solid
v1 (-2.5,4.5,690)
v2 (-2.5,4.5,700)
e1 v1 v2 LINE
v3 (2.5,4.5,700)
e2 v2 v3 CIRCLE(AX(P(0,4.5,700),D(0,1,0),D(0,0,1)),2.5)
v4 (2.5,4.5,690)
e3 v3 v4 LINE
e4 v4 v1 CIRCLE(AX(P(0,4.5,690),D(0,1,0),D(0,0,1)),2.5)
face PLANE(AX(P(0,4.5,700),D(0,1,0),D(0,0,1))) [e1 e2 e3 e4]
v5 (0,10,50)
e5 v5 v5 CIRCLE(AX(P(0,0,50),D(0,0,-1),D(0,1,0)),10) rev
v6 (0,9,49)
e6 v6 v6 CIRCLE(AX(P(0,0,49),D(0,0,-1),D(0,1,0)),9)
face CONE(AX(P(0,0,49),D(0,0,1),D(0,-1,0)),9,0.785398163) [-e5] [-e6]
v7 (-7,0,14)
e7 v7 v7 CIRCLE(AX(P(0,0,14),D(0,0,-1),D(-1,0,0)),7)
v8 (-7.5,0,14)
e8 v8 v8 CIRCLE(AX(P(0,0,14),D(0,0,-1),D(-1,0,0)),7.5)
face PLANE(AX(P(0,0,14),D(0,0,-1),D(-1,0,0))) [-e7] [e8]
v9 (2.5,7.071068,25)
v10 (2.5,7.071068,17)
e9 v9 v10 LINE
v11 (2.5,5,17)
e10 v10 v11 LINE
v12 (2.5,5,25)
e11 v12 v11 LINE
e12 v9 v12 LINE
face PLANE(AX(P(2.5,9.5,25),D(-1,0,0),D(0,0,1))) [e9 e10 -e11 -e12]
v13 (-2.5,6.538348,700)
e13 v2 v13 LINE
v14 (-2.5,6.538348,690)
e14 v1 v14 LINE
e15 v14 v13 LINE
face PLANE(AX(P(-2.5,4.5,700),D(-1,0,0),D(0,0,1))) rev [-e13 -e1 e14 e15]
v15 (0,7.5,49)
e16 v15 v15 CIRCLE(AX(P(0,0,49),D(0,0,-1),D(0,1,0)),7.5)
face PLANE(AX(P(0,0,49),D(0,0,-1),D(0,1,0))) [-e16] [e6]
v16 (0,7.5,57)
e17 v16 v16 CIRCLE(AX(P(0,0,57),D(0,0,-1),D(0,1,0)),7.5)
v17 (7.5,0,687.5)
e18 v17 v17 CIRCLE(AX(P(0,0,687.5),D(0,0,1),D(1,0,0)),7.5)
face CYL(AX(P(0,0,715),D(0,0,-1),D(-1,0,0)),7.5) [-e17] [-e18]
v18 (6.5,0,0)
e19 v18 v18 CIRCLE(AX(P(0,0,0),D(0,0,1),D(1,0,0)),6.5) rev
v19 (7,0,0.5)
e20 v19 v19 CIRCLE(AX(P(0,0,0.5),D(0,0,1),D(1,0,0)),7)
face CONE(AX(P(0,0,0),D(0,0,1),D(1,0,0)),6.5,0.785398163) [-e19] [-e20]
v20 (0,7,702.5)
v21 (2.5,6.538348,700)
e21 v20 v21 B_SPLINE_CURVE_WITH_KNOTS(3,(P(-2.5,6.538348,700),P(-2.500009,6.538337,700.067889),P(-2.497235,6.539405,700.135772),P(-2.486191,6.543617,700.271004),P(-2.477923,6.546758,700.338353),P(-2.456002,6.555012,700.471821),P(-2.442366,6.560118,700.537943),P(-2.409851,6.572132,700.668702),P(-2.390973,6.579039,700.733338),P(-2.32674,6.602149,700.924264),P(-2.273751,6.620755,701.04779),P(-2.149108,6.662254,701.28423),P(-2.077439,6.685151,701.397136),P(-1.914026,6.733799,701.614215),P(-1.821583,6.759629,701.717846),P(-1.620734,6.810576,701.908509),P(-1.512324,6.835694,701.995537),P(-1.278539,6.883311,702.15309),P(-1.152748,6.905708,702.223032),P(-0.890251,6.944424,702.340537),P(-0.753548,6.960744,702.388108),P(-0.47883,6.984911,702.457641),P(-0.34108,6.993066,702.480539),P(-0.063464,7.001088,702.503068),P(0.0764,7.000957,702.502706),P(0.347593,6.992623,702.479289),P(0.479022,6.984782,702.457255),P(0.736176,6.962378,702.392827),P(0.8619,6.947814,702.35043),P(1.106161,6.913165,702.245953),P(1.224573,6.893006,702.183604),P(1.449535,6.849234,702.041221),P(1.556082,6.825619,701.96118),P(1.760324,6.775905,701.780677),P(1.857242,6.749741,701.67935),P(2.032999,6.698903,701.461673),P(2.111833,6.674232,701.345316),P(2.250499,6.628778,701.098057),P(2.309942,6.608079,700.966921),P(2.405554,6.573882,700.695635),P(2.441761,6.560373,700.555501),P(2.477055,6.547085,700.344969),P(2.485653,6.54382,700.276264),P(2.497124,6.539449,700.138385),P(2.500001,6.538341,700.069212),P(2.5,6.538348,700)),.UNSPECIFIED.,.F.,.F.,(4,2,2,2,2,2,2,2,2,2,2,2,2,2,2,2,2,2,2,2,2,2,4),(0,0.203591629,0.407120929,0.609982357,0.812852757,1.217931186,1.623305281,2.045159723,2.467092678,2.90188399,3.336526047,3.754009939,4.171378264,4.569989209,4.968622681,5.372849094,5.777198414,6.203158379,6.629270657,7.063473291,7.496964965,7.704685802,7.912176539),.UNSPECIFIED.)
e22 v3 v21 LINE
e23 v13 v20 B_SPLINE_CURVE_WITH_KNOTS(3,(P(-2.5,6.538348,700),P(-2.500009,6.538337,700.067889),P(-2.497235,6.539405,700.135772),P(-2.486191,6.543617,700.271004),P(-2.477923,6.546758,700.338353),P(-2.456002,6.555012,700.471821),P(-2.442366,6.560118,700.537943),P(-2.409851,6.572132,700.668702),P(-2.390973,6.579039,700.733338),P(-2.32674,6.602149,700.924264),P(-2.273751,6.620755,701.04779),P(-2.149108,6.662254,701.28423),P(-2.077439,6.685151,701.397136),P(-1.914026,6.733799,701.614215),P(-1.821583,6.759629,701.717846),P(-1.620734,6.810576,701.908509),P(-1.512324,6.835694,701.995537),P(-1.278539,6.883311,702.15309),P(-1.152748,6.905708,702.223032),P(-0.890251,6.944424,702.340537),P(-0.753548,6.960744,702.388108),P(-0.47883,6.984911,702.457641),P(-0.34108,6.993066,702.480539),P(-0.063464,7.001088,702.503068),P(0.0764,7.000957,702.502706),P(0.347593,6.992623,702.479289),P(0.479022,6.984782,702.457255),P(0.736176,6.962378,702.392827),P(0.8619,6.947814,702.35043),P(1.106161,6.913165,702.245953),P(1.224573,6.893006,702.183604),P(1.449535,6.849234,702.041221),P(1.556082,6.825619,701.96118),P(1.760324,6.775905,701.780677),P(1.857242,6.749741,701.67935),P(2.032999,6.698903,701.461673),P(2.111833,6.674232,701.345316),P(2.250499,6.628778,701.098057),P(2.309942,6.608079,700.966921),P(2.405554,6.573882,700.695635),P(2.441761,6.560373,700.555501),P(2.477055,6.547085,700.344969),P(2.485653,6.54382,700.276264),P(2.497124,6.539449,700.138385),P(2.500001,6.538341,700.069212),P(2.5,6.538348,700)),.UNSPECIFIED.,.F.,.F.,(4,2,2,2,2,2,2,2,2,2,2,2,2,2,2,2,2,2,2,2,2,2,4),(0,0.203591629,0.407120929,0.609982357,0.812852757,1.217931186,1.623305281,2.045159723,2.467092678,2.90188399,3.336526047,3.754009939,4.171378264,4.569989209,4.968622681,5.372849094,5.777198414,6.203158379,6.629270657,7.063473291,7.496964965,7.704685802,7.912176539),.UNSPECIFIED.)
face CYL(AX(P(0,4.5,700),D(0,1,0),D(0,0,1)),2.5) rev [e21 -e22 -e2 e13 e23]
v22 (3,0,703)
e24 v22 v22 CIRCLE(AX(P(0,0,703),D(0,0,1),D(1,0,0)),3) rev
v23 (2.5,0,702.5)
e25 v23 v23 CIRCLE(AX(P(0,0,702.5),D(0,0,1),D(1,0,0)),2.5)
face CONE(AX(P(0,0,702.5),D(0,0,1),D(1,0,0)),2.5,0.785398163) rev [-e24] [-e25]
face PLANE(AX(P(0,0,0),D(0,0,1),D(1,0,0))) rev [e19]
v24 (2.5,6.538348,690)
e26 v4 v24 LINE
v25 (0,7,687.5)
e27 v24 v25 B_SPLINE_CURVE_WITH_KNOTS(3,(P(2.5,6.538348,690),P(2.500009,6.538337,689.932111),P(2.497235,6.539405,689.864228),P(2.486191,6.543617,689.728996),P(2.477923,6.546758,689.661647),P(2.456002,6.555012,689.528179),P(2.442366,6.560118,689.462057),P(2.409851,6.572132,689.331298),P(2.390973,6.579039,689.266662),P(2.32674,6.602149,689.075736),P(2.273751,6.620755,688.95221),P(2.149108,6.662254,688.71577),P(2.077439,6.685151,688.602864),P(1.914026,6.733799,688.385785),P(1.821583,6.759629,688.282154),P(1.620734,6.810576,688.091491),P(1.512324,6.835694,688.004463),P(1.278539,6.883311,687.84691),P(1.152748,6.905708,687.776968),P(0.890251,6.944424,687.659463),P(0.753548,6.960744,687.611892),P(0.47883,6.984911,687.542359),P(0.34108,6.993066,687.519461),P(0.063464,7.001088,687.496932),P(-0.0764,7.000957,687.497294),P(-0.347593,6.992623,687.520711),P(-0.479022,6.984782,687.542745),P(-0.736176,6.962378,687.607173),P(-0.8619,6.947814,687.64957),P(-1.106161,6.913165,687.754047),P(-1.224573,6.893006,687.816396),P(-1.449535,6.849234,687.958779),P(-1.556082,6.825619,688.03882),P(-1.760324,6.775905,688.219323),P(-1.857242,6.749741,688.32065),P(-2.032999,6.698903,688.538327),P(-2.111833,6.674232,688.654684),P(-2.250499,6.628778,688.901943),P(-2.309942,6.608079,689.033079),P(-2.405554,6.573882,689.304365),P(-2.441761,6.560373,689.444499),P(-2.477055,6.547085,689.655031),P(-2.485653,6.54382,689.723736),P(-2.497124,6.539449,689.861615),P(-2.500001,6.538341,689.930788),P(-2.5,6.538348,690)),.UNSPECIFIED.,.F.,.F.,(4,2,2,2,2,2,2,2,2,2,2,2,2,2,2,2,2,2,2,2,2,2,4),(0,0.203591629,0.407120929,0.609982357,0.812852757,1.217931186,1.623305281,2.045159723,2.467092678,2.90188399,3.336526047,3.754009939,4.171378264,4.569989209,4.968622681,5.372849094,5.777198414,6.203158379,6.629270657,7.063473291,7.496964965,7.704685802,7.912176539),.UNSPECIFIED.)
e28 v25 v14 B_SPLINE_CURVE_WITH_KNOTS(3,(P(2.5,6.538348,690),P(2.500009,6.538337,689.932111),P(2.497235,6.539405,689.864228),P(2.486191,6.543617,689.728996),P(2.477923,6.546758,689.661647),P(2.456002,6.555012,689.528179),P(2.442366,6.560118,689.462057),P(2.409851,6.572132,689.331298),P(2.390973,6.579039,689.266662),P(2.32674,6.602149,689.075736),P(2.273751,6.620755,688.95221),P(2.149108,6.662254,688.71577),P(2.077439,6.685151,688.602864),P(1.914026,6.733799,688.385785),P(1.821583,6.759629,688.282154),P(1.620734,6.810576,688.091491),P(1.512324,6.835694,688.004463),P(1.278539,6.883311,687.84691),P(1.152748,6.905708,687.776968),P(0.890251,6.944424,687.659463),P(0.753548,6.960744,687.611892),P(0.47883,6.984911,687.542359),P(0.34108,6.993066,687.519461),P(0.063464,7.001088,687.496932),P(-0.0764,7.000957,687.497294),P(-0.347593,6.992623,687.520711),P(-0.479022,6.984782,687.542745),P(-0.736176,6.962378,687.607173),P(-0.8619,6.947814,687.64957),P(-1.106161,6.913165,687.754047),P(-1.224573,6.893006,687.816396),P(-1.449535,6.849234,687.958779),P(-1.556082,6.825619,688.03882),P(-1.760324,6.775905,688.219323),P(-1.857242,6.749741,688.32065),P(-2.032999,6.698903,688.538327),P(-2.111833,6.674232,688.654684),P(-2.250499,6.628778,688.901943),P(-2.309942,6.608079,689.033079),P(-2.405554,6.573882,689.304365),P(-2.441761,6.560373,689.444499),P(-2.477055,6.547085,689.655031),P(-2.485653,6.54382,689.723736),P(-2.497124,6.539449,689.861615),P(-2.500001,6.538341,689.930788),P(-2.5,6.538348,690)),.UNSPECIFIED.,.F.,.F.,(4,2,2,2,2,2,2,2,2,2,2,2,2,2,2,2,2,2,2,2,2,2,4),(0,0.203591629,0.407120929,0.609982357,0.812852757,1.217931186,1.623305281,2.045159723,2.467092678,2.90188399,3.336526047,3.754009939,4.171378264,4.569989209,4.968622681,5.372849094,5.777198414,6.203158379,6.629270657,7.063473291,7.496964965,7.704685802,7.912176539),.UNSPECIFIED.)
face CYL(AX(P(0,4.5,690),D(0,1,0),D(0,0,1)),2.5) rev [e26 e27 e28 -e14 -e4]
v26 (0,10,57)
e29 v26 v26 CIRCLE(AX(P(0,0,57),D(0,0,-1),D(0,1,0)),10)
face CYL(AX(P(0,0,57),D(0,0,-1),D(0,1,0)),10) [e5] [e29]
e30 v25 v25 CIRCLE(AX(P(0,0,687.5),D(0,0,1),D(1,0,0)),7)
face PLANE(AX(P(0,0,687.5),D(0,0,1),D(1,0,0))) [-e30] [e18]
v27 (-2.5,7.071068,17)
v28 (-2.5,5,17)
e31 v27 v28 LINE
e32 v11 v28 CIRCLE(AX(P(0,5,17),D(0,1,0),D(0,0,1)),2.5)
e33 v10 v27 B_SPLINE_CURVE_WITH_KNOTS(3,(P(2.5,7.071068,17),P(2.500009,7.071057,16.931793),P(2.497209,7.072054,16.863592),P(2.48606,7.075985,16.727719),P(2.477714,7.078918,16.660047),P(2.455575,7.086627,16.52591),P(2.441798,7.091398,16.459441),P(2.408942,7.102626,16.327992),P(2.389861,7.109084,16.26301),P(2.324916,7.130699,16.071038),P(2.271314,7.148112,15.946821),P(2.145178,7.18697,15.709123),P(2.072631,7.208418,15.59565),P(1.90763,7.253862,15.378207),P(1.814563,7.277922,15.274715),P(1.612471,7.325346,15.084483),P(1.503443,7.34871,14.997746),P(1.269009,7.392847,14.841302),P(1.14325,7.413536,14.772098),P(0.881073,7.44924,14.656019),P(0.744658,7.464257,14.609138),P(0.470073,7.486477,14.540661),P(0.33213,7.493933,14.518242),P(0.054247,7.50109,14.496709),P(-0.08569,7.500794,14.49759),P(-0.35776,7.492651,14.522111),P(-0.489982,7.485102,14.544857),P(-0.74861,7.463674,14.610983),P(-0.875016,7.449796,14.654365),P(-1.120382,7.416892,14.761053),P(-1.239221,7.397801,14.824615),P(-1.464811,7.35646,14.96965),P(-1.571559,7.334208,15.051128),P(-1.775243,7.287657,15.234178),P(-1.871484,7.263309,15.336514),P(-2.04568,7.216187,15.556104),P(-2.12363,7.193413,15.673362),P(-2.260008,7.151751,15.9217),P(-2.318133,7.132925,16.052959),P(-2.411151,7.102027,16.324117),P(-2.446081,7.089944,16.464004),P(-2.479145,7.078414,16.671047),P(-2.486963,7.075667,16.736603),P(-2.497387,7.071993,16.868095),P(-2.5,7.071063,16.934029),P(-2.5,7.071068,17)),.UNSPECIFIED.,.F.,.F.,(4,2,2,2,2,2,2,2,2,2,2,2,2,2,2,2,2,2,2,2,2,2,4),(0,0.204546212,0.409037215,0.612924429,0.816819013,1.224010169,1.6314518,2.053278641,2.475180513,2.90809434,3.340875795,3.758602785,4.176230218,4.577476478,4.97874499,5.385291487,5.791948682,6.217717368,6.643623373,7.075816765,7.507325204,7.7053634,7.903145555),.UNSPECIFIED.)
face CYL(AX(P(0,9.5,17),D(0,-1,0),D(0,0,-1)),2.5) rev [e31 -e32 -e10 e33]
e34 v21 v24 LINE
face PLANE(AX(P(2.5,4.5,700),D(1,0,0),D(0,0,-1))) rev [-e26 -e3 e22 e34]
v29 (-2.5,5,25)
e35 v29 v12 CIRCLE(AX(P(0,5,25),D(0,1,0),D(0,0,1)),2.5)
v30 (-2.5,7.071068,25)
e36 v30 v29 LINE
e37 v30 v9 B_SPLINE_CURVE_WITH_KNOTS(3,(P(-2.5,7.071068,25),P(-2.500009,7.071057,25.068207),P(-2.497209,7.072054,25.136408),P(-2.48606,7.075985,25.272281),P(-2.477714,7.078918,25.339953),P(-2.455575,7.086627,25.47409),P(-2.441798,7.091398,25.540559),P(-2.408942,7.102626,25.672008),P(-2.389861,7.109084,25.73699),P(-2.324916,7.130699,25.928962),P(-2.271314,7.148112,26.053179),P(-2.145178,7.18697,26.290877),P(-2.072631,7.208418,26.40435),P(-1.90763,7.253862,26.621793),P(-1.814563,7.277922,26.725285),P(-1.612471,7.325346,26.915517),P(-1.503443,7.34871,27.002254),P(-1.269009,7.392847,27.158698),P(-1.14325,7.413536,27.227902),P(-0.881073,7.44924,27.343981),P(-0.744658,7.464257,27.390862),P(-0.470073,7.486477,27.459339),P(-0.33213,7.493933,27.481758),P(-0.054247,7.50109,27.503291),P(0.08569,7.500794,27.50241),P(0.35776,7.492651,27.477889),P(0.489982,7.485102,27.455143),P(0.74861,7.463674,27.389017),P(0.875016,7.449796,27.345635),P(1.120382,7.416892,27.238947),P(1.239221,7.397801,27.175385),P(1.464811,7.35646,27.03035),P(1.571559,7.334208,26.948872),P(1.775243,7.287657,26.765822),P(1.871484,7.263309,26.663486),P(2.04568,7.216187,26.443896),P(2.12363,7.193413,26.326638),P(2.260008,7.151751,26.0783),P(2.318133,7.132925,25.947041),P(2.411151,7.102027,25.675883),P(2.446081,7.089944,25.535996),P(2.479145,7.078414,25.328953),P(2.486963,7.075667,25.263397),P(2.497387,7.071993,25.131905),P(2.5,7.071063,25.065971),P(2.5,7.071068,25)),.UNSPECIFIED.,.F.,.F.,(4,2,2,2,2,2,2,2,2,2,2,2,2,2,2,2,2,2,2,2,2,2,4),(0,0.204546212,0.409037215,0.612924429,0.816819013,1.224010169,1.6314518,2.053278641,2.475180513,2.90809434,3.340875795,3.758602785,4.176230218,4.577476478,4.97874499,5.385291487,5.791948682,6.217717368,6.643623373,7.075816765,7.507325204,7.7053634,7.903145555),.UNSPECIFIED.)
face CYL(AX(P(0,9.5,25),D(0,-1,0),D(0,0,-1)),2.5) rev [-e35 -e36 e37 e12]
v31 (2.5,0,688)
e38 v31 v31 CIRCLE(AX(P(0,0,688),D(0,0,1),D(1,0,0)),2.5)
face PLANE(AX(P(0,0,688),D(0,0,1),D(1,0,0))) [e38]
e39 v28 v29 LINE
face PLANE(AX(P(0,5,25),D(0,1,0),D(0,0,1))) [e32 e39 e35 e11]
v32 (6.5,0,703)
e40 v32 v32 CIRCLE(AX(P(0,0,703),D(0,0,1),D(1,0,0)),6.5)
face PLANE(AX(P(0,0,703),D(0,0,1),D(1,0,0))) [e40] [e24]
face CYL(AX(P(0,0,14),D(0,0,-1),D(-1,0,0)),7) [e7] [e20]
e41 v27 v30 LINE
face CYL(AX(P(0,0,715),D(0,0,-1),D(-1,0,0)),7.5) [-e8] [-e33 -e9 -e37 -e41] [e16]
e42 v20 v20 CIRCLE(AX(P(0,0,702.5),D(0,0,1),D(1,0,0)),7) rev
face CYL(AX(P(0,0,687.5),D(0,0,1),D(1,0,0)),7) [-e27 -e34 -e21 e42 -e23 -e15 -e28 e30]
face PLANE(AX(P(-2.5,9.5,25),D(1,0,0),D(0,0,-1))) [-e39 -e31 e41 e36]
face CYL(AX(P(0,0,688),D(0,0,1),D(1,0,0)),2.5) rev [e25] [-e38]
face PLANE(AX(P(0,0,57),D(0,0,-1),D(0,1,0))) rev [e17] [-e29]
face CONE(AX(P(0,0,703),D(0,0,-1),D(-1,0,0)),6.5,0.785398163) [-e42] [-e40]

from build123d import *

# Parameters (mm, degrees)
SKETCH_1_R                = 7.5
EXTRUDE_1_DEPTH           = 715
SKETCH_4_R                = 7.5
SKETCH_4_R_2              = 7
CUT_EXTRUDE_3_DEPTH       = 14
CHAMFER_1_SIZE            = 0.5
CUT_EXTRUDE_START         = -27.5
SKETCH_6_R                = 7.5
SKETCH_6_R_2              = 7
CUT_EXTRUDE_5_DEPTH       = 27.5
CHAMFER_2_SIZE            = 1
CUT_EXTRUDE_START_2       = -12
SKETCH_7_R                = 7
SKETCH_7_R_2              = 6.9
CUT_EXTRUDE_6_DEPTH       = 12
SKETCH_8_R                = 10
SKETCH_8_R_2              = 7.5
EXTRUDE_2_DEPTH           = 8
CHAMFER_3_SIZE            = 1
CUT_EXTRUDE_8_DEPTH       = 2.5
CUT_EXTRUDE_11_DEPTH      = 2.5
CUT_EXTRUDE_11_DEPTH_BACK = 2
SKETCH_17_R               = 6.9
CUT_EXTRUDE_14_DEPTH      = 12
CHAMFER_6_SIZE            = 0.5
SKETCH_20_R               = 2.5
CUT_EXTRUDE_16_DEPTH      = 15
CHAMFER_7_SIZE            = 0.5


with BuildPart() as part:
    # 草图1 → 拉伸1 (new body)
    with BuildSketch(Plane.XY):
        Circle(SKETCH_1_R)
    extrude(amount=EXTRUDE_1_DEPTH)

    # 草图4 → 切除-拉伸3 (cut)
    with BuildSketch(Plane(origin=(0, 0, 0), x_dir=(-1, 0, 0), z_dir=(0, 0, -1))):
        Circle(SKETCH_4_R)
        Circle(SKETCH_4_R_2, mode=Mode.SUBTRACT)
    extrude(amount=-CUT_EXTRUDE_3_DEPTH, mode=Mode.SUBTRACT)

    # 倒角1
    chamfer_1_edges = [part.edges().sort_by_distance(p)[0] for p in [
        (7, 0, 0),
    ]]
    chamfer(chamfer_1_edges, length=CHAMFER_1_SIZE)

    # 草图6 → 切除-拉伸5 (cut)
    with BuildSketch(Plane.XY.offset(715).offset(CUT_EXTRUDE_START)):
        with Locations(Location((0, 0, 0), (0, 0, 180))):
            Circle(SKETCH_6_R)
        with Locations(Location((0, 0, 0), (0, 0, 180))):
            Circle(SKETCH_6_R_2, mode=Mode.SUBTRACT)
    extrude(amount=CUT_EXTRUDE_5_DEPTH, mode=Mode.SUBTRACT)

    # 倒角2
    chamfer_2_edges = [part.edges().sort_by_distance(p)[0] for p in [
        (7, 0, 715),
    ]]
    chamfer(chamfer_2_edges, length=CHAMFER_2_SIZE)

    # 草图7 → 切除-拉伸6 (cut)
    with BuildSketch(Plane.XY.offset(715).offset(CUT_EXTRUDE_START_2)):
        Circle(SKETCH_7_R)
        Circle(SKETCH_7_R_2, mode=Mode.SUBTRACT)
    extrude(amount=CUT_EXTRUDE_6_DEPTH, mode=Mode.SUBTRACT)

    # 草图8 → 拉伸2 (add)
    with BuildSketch(Plane(origin=(0, 0, 49), x_dir=(-1, 0, 0), z_dir=(0, 0, -1))):
        with Locations(Location((0, 0, 0), (0, 0, 90))):
            Circle(SKETCH_8_R)
        with Locations(Location((0, 0, 0), (0, 0, 90))):
            Circle(SKETCH_8_R_2, mode=Mode.SUBTRACT)
    extrude(amount=-EXTRUDE_2_DEPTH)

    # 倒角3
    chamfer_3_edges = [part.edges().sort_by_distance(p)[0] for p in [
        (0, -10, 49),
    ]]
    chamfer(chamfer_3_edges, length=CHAMFER_3_SIZE)

    # 草图11 → 切除-拉伸8 (cut)
    with BuildSketch(Plane(origin=(0, 7, 0), x_dir=(-1, 0, 0), z_dir=(0, 1, 0))):
        with BuildLine():
            Line((-2.5, 700), (-2.5, 690))
            ThreePointArc((-2.5, 690), (0, 687.5), (2.5, 690))
            Line((2.5, 690), (2.5, 700))
            ThreePointArc((2.5, 700), (0, 702.5), (-2.5, 700))
        make_face()
    extrude(amount=-CUT_EXTRUDE_8_DEPTH, mode=Mode.SUBTRACT)

    # 草图14 → 切除-拉伸11 (cut, two sides: drawn at the far end of the back side and taken through both)
    with BuildSketch(Plane(origin=(0, 7, 0), x_dir=(-1, 0, 0), z_dir=(0, 1, 0)).offset(-CUT_EXTRUDE_11_DEPTH_BACK)):
        with BuildLine():
            Line((-2.5, 25), (-2.5, 17))
            ThreePointArc((-2.5, 17), (0, 14.5), (2.5, 17))
            Line((2.5, 17), (2.5, 25))
            ThreePointArc((2.5, 25), (0, 27.5), (-2.5, 25))
        make_face()
    extrude(amount=CUT_EXTRUDE_11_DEPTH + CUT_EXTRUDE_11_DEPTH_BACK, mode=Mode.SUBTRACT)

    # 草图17 → 切除-拉伸14 (cut)
    with BuildSketch(Plane.XY.offset(715).offset(CUT_EXTRUDE_START_2)):
        Circle(SKETCH_17_R)
    extrude(amount=CUT_EXTRUDE_14_DEPTH, mode=Mode.SUBTRACT)

    # 倒角6
    chamfer_6_edges = [part.edges().sort_by_distance(p)[0] for p in [
        (7, 0, 703),
    ]]
    chamfer(chamfer_6_edges, length=CHAMFER_6_SIZE - 0.0001)  # a hair under: the kernel refuses the full size

    # 草图20 → 切除-拉伸16 (cut)
    with BuildSketch(Plane.XY.offset(703)):
        Circle(SKETCH_20_R)
    extrude(amount=-CUT_EXTRUDE_16_DEPTH, mode=Mode.SUBTRACT)

    # 倒角7
    chamfer_7_edges = [part.edges().sort_by_distance(p)[0] for p in [
        (-2.5, 0, 703),
    ]]
    chamfer(chamfer_7_edges, length=CHAMFER_7_SIZE)


solid = part.part
